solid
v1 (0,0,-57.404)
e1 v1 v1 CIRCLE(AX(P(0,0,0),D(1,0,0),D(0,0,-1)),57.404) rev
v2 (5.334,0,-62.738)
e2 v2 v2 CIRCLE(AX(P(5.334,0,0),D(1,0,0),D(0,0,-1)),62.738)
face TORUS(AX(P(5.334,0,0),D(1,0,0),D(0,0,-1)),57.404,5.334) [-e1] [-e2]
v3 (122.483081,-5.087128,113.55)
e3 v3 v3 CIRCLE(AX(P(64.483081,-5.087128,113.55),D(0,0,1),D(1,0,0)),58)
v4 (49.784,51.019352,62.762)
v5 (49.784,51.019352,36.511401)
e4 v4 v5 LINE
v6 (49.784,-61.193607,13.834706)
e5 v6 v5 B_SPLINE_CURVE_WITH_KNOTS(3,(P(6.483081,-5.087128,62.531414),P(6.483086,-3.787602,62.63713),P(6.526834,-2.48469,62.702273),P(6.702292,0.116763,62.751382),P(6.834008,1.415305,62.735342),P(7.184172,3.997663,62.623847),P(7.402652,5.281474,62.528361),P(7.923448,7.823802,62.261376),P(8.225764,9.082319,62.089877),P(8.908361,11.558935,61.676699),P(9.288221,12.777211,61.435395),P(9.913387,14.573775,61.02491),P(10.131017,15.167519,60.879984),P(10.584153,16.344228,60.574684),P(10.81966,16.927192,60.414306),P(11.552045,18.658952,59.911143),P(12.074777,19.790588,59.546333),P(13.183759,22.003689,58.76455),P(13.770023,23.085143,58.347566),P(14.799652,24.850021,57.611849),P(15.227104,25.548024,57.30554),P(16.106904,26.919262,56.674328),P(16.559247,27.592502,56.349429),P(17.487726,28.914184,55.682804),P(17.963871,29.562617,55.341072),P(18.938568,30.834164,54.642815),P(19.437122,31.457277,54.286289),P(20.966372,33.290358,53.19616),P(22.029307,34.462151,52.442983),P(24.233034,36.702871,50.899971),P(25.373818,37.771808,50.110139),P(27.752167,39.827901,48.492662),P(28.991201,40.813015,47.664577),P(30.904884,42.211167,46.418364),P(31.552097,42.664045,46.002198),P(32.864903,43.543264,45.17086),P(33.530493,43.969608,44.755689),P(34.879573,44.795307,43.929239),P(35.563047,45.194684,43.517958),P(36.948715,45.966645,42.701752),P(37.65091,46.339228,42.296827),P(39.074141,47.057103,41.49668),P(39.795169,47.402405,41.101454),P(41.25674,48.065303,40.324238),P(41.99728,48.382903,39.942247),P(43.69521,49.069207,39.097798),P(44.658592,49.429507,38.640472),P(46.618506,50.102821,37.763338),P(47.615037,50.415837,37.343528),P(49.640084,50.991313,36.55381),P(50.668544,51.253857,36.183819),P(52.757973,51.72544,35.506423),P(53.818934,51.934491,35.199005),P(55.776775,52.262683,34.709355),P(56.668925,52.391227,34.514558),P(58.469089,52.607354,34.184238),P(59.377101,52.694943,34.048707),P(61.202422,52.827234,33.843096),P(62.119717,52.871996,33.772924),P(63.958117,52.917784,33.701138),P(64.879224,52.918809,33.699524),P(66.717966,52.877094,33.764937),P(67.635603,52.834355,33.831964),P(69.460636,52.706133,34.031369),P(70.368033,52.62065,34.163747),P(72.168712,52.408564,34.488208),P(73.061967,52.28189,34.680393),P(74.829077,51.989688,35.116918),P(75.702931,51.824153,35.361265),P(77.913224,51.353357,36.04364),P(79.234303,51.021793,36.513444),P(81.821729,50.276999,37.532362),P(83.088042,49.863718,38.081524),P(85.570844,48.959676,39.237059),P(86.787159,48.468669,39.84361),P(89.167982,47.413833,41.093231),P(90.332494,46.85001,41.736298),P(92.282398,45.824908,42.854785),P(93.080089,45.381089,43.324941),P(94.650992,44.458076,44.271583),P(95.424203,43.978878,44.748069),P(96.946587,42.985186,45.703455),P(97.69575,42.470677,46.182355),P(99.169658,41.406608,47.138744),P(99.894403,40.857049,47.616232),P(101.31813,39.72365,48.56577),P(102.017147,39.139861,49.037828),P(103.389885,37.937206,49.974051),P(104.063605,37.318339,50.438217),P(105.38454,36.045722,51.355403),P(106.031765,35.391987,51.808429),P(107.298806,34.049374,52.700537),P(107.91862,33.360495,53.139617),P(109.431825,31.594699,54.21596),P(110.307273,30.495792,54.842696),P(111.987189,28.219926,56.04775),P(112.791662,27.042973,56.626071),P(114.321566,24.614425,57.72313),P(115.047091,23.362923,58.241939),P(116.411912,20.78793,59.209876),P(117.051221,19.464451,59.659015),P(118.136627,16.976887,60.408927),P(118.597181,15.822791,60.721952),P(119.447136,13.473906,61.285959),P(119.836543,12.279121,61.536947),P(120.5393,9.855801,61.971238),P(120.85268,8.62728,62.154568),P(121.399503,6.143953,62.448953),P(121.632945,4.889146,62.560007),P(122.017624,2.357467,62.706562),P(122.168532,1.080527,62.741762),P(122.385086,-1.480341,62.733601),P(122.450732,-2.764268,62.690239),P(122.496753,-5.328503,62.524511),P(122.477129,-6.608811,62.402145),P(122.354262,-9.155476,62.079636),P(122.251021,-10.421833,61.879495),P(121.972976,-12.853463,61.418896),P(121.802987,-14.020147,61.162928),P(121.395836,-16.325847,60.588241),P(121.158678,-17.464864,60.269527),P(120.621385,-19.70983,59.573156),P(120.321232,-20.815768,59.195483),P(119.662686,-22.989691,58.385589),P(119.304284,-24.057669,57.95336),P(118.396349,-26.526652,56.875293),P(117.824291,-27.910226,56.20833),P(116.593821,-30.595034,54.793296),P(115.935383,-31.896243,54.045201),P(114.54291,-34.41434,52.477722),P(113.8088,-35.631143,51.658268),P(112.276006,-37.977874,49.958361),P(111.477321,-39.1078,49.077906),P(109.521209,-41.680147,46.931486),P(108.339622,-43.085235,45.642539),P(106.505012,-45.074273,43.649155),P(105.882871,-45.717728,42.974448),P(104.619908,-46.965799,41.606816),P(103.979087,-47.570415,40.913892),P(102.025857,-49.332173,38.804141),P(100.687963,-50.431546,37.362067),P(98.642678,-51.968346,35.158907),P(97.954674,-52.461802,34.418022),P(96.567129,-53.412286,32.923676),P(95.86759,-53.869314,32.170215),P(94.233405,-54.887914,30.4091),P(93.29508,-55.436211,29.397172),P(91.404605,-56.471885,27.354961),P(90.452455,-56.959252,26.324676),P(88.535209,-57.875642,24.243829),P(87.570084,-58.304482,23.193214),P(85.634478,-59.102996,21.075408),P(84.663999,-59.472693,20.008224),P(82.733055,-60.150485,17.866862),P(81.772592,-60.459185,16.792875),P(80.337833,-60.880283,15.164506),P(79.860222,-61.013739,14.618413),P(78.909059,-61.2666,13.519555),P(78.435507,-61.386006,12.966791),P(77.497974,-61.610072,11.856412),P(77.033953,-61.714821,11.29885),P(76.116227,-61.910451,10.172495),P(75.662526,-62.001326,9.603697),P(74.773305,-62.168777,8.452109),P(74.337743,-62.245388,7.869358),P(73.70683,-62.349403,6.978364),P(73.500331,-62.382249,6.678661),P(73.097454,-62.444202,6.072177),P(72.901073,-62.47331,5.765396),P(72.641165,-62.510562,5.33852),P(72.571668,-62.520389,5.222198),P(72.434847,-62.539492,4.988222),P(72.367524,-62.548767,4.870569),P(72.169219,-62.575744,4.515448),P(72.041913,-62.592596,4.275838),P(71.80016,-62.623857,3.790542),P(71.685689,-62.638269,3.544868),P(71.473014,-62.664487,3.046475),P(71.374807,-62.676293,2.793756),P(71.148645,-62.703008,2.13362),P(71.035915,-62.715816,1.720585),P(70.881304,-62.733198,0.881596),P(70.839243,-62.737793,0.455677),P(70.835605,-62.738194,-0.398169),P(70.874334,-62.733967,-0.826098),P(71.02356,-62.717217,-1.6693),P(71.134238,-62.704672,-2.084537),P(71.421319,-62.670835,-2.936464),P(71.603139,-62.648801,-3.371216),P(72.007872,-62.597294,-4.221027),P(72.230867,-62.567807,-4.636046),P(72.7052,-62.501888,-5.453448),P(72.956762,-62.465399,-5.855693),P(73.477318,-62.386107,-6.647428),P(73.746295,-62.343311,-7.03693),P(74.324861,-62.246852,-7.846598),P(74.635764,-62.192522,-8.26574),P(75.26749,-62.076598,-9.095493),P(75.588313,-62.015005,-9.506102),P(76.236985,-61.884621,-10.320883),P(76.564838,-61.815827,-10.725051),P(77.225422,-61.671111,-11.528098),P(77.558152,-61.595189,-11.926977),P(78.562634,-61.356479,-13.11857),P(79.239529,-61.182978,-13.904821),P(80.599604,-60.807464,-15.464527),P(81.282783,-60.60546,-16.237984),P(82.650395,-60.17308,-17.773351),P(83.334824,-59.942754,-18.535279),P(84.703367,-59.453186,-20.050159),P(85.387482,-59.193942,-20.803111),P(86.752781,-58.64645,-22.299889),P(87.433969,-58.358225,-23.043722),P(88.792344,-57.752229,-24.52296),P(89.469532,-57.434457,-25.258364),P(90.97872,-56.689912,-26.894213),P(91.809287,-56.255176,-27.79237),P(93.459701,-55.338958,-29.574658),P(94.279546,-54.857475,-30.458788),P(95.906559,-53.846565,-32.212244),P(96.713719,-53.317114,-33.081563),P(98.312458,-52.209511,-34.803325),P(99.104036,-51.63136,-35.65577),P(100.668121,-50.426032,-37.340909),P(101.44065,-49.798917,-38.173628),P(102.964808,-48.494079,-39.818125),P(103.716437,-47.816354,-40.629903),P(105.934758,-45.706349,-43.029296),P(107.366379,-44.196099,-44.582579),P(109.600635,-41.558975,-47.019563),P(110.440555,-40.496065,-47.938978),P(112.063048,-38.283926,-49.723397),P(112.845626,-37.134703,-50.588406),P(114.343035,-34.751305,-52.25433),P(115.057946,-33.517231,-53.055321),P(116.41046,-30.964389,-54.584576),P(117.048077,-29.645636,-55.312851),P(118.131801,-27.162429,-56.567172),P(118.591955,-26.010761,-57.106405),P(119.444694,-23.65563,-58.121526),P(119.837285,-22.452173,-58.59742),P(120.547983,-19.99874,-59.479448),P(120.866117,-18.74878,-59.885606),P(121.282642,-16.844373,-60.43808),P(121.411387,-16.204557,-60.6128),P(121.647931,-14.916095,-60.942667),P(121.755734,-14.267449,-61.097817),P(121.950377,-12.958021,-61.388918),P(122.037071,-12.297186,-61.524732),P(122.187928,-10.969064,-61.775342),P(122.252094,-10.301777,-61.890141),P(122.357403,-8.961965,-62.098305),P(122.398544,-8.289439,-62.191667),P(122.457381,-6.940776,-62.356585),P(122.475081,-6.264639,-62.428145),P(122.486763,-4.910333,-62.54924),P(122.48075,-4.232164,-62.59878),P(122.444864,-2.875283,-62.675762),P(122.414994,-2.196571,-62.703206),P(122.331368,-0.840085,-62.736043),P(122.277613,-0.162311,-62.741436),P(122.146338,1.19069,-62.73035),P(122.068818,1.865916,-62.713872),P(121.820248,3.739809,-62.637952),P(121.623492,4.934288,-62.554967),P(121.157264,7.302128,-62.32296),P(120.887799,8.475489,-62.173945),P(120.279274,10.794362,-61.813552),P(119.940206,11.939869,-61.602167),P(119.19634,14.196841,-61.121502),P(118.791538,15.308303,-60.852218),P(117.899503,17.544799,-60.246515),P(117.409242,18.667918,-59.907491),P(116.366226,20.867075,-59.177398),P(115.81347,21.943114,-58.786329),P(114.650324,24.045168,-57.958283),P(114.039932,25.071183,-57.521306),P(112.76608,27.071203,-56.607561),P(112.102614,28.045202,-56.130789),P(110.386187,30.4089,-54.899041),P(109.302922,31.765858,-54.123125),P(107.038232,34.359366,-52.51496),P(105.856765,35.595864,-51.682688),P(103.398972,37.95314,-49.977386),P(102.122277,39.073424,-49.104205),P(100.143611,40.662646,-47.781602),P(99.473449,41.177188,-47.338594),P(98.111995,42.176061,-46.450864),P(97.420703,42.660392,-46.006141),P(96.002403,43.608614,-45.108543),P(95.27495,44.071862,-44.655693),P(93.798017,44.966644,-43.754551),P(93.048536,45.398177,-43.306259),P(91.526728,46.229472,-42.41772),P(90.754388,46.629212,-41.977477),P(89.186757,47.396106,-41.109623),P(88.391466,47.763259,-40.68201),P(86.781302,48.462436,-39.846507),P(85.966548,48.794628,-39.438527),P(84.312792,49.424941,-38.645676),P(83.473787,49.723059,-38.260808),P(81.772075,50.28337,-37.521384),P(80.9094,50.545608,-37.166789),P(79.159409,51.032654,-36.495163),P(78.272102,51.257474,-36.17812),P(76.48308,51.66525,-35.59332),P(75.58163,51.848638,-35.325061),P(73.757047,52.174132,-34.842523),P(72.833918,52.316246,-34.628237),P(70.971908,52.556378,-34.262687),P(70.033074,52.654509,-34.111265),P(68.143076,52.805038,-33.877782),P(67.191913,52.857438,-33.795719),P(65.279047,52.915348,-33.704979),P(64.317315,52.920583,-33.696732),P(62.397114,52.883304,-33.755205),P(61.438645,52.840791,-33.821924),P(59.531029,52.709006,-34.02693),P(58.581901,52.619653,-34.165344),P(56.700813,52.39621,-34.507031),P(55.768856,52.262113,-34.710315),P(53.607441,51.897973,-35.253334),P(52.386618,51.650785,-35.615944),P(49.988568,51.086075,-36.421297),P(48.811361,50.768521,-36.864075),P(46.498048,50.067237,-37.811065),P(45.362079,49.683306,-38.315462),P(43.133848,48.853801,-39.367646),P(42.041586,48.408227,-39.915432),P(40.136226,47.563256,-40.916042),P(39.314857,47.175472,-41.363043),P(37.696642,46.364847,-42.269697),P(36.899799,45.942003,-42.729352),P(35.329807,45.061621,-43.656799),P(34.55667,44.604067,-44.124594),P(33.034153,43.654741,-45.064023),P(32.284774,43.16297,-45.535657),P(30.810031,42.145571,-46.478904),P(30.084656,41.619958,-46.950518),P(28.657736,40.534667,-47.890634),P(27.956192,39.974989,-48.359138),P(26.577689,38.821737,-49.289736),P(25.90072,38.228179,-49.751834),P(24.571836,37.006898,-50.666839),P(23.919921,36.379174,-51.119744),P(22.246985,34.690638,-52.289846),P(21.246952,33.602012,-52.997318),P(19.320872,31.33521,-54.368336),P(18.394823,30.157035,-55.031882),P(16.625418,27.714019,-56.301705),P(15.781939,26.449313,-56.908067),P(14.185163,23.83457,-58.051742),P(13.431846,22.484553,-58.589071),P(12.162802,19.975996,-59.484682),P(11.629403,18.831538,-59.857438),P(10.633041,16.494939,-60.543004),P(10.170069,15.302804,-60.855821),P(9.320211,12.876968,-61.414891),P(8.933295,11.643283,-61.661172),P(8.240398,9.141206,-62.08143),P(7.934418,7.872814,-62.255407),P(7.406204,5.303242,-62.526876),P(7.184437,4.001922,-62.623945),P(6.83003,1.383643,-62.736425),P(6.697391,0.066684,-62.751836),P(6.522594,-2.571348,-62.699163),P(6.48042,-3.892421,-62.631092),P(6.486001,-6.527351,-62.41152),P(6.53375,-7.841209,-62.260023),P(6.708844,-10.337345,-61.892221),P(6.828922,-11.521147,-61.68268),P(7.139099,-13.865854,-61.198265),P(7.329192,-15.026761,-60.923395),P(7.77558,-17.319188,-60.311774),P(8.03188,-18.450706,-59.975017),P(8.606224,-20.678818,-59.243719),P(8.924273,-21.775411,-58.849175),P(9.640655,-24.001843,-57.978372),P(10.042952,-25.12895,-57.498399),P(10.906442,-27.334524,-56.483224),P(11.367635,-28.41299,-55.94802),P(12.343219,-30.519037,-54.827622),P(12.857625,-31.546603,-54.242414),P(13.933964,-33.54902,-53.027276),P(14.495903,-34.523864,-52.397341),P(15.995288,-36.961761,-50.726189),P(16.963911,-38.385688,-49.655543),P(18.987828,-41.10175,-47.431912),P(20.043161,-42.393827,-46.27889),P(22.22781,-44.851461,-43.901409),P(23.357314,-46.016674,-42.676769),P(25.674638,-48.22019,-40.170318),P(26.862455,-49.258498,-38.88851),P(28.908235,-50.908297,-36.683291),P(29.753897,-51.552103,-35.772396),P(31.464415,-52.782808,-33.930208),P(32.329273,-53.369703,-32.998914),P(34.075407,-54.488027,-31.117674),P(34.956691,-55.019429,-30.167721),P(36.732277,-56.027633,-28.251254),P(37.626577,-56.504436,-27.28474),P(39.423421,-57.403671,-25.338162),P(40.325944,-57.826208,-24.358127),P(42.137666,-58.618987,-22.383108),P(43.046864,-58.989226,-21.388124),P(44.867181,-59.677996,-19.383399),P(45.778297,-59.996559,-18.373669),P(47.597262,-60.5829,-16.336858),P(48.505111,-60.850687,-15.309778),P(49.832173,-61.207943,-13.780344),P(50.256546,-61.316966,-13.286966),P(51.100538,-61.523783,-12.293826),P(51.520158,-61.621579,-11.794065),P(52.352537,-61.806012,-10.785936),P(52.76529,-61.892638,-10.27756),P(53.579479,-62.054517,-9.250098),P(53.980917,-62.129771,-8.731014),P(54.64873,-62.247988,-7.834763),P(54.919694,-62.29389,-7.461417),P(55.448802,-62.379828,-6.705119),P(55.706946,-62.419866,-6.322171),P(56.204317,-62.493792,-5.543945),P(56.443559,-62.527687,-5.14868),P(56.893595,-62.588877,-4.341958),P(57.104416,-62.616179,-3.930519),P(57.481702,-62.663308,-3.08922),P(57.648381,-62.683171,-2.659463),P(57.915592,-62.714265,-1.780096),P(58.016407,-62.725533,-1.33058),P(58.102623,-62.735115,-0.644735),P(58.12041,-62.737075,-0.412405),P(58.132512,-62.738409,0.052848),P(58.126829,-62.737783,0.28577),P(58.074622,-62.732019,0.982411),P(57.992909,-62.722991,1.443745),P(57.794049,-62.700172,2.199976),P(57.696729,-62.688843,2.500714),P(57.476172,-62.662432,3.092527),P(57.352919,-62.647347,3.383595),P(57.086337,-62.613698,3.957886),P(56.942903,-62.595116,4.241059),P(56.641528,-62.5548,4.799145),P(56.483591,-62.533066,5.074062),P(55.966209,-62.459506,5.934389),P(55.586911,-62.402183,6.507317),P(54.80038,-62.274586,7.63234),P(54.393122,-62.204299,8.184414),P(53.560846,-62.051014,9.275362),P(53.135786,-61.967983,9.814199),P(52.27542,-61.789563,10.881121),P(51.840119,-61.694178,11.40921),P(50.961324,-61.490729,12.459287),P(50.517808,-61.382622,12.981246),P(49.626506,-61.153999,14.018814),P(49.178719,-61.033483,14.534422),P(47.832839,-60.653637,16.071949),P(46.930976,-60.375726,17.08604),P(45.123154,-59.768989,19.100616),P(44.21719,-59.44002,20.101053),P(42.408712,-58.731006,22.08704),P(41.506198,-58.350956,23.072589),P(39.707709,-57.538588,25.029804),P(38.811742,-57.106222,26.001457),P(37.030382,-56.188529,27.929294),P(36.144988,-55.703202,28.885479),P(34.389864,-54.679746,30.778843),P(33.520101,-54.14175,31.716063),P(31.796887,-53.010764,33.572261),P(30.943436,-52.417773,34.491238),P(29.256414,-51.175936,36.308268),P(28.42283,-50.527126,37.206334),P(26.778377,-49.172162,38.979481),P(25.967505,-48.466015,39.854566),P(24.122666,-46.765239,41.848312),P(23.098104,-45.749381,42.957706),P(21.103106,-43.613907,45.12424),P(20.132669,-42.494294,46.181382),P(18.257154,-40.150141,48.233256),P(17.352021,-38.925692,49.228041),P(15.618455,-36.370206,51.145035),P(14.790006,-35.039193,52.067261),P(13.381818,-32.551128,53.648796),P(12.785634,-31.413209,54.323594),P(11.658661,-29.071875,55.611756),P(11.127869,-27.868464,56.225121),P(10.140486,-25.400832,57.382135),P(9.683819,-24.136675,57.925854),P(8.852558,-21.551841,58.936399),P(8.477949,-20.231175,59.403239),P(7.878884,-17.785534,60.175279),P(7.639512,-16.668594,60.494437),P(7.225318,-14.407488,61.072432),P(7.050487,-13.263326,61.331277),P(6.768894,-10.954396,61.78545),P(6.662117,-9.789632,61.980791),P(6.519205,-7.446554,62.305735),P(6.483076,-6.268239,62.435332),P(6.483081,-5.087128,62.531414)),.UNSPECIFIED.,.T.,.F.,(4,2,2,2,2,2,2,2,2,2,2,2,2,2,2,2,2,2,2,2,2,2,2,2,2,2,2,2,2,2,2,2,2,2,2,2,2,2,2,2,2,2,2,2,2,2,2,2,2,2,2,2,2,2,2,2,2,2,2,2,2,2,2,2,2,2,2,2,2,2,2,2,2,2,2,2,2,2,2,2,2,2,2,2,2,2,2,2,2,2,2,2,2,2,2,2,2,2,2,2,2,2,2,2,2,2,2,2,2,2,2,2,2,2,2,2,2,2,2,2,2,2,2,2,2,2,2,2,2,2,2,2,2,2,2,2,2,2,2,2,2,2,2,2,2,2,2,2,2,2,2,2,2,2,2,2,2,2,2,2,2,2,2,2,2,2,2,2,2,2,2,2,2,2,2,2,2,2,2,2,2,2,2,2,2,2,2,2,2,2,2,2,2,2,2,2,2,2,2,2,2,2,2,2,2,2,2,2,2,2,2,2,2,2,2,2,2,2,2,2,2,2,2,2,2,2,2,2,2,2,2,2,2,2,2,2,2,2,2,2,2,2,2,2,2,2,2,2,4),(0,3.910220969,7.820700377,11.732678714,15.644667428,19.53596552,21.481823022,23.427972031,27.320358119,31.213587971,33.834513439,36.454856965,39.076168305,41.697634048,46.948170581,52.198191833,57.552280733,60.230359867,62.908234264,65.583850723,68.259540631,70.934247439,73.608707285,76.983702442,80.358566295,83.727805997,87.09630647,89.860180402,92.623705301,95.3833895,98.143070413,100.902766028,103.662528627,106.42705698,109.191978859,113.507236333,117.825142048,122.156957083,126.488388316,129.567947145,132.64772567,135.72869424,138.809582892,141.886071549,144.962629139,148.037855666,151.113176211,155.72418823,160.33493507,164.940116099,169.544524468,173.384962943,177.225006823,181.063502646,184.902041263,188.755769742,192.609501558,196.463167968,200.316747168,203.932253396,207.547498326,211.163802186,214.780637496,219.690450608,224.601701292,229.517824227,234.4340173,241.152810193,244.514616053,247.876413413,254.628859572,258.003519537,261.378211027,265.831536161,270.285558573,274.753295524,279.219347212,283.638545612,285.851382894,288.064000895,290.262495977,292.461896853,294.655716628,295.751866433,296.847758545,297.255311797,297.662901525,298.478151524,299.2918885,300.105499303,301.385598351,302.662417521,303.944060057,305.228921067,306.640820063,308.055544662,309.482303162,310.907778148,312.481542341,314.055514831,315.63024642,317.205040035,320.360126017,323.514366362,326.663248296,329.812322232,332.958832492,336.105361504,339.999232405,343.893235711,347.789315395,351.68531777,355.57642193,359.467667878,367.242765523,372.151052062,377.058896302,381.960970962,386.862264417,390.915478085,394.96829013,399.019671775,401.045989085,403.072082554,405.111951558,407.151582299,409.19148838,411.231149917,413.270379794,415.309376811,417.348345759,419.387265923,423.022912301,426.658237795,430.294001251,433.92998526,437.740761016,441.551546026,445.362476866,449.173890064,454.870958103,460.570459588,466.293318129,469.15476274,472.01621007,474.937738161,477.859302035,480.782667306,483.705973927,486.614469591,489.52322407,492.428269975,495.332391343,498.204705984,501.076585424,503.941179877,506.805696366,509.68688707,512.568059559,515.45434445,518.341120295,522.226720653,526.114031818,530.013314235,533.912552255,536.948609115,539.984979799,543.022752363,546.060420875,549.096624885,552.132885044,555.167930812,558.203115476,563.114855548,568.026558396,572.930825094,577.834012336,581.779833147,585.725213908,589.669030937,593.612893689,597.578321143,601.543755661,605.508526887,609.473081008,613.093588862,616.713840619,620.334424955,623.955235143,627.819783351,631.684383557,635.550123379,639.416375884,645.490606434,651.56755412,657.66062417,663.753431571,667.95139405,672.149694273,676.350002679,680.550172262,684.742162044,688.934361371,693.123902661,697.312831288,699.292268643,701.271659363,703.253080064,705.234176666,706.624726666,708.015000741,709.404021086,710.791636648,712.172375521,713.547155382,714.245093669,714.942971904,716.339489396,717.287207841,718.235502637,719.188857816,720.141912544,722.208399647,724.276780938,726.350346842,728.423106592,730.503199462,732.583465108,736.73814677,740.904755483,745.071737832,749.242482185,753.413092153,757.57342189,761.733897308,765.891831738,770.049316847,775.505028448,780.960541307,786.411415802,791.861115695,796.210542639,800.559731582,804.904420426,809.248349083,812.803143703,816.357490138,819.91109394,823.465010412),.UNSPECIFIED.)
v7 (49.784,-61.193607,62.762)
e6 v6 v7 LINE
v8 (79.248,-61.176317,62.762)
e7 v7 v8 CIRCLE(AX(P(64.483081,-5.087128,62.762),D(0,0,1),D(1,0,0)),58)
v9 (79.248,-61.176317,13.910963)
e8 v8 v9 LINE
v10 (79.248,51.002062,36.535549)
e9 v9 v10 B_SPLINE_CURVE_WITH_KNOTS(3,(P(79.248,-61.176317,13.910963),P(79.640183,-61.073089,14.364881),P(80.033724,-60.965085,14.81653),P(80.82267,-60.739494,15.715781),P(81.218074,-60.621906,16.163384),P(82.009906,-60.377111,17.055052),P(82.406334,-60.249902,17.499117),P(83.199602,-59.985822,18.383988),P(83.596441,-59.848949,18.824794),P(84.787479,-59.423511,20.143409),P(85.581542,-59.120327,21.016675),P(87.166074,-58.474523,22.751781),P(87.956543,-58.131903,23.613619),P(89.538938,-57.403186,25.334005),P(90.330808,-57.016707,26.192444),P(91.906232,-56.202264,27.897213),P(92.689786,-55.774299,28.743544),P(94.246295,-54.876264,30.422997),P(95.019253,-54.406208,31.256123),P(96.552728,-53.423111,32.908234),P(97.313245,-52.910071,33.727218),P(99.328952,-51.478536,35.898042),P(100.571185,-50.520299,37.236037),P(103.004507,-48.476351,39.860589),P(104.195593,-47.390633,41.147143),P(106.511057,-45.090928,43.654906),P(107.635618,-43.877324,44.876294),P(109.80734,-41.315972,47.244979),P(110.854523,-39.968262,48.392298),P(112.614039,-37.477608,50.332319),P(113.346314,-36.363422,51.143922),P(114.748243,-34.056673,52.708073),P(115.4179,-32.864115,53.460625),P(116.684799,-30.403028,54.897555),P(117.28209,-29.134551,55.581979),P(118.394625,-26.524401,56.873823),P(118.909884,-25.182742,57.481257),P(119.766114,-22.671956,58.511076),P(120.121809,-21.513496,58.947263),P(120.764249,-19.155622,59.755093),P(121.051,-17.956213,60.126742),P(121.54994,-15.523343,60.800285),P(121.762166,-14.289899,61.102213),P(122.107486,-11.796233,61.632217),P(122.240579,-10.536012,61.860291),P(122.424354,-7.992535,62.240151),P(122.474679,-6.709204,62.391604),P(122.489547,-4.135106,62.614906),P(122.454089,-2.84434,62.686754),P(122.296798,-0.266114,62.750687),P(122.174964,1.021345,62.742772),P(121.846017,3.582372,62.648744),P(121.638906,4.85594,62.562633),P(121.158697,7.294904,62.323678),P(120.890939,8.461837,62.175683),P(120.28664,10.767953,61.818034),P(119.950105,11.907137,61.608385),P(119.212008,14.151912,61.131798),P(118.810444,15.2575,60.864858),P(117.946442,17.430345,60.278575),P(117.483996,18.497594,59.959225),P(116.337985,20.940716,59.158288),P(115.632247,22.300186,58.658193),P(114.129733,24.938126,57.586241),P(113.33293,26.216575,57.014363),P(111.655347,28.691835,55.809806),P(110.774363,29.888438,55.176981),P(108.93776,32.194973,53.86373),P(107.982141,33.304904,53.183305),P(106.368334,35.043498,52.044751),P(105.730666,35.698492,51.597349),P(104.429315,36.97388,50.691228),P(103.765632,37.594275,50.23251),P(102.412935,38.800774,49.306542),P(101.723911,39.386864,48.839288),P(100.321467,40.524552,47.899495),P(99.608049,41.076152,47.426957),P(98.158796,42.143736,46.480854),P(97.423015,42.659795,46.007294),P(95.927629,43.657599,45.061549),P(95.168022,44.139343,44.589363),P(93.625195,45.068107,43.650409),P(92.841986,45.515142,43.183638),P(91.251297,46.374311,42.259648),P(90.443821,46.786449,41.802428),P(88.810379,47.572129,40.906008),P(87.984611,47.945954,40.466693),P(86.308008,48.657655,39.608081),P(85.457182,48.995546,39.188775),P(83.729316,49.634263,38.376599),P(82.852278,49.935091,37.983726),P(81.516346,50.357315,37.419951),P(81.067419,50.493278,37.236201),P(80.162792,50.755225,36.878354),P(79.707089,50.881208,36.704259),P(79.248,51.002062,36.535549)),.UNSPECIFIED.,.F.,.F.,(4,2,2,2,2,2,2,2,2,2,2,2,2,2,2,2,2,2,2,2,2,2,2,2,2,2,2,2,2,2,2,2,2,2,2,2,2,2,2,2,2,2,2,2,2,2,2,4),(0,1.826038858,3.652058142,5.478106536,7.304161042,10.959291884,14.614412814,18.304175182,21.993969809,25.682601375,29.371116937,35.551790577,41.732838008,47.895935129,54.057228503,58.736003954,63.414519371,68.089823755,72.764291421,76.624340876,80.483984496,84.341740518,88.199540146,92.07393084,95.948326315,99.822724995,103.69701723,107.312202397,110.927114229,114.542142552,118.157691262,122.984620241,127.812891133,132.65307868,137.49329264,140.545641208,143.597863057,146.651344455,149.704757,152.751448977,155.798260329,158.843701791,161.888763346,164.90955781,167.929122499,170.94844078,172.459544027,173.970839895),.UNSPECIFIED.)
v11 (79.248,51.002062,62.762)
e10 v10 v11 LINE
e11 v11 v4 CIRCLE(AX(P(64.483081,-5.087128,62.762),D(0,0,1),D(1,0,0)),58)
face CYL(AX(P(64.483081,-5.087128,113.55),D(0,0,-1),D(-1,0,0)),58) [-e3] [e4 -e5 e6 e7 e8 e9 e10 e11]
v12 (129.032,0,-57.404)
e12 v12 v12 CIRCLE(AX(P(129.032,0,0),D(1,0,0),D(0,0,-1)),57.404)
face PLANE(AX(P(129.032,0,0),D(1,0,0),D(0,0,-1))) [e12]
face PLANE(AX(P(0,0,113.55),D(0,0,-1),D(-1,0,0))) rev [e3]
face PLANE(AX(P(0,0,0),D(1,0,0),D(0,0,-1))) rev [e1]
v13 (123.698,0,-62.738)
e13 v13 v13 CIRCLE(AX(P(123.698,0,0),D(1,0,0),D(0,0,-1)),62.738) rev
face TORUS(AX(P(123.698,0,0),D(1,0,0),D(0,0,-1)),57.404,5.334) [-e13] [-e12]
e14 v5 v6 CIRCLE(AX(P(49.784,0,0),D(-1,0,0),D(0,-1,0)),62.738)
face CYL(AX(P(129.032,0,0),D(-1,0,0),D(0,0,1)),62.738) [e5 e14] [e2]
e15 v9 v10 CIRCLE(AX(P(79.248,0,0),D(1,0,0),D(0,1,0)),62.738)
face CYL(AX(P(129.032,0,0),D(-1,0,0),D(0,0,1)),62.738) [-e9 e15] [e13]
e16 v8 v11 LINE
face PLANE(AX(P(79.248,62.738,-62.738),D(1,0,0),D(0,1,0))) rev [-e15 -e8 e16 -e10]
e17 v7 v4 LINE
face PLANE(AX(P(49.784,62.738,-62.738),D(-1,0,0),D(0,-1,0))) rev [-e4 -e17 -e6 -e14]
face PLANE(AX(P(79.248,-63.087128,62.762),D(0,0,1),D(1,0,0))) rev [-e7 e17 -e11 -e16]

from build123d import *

# Parameters (mm, degrees)
SKETCH1_R               = 62.738
BOSS_EXTRUDE1_DEPTH     = 129.032
FILLET1_R               = 5.334
FILLET2_R               = 5.334
CUT_EXTRUDE1_DEPTH      = 157.593008583
CUT_EXTRUDE1_DEPTH_BACK = 157.593008583
SKETCH2_W               = 29.464
SKETCH2_H               = 125.476
BOSS_EXTRUDE2_START     = 10.518
BOSS_EXTRUDE2_OUTLINE_R = 58
BOSS_EXTRUDE2_DEPTH     = 103.032
CUT_EXTRUDE2_DEPTH      = 184.092449966
CUT_EXTRUDE2_DEPTH_BACK = 184.092449966
SKETCH3_W               = 29.464
SKETCH3_H               = 125.5


# Read off the part's stored shape, not the designer's step: Boss-Extrude2
with BuildPart() as part:
    # Sketch1 → Boss-Extrude1 (new body)
    with BuildSketch(Plane(origin=(0, 0, 0), x_dir=(0, 0, -1), z_dir=(1, 0, 0))):
        Circle(SKETCH1_R)
    extrude(amount=BOSS_EXTRUDE1_DEPTH)

    # Fillet1
    fillet1_edges = [part.edges().sort_by_distance(p)[0] for p in [
        (0, 0, 62.738),
    ]]
    fillet(fillet1_edges, radius=FILLET1_R)

    # Fillet2
    fillet2_edges = [part.edges().sort_by_distance(p)[0] for p in [
        (129.032, 0, 62.738),
    ]]
    fillet(fillet2_edges, radius=FILLET2_R)

    # Sketch2 → Cut-Extrude1 (cut, two sides: drawn at the far end of the back side and taken through both)
    with BuildSketch(Plane.XY.offset(-CUT_EXTRUDE1_DEPTH_BACK)):
        with Locations((64.516, 0)):
            Rectangle(SKETCH2_W, SKETCH2_H)
    extrude(amount=CUT_EXTRUDE1_DEPTH + CUT_EXTRUDE1_DEPTH_BACK, mode=Mode.SUBTRACT)


with BuildPart() as cut_extrude1_piece_1:
    # of the separate pieces the step leaves, piece 1, a body of its own (cut_extrude1_pieces)
    add(part.part.solids().sort_by_distance((5.334, 0, -62.738))[0])



with BuildPart() as cut_extrude1_piece_2:
    # of the separate pieces the step leaves, piece 2, a body of its own (cut_extrude1_pieces)
    add(part.part.solids().sort_by_distance((79.248, 0, -62.738))[0])


with BuildPart() as cut_extrude1_piece_1_1:
    add(cut_extrude1_piece_1.part)

    add(cut_extrude1_piece_2.part)  # Boss-Extrude2 merges Cut-Extrude1 piece 2
    # Boss-Extrude2 outline → Boss-Extrude2 (add)
    with BuildSketch(Plane.XY.offset(BOSS_EXTRUDE2_START)):
        with Locations((64.483080673, -5.087127651)):
            Circle(BOSS_EXTRUDE2_OUTLINE_R)
    extrude(amount=BOSS_EXTRUDE2_DEPTH)

    # Sketch3 → Cut-Extrude2 (cut, two sides: drawn at the far end of the back side and taken through both)
    with BuildSketch(Plane(origin=(0, 0, 0), x_dir=(1, 0, 0), z_dir=(0, 1, 0)).offset(-CUT_EXTRUDE2_DEPTH_BACK)):
        with Locations((64.516, -0.012)):
            Rectangle(SKETCH3_W, SKETCH3_H)
    extrude(amount=CUT_EXTRUDE2_DEPTH + CUT_EXTRUDE2_DEPTH_BACK, mode=Mode.SUBTRACT)


solid = cut_extrude1_piece_1_1.part
